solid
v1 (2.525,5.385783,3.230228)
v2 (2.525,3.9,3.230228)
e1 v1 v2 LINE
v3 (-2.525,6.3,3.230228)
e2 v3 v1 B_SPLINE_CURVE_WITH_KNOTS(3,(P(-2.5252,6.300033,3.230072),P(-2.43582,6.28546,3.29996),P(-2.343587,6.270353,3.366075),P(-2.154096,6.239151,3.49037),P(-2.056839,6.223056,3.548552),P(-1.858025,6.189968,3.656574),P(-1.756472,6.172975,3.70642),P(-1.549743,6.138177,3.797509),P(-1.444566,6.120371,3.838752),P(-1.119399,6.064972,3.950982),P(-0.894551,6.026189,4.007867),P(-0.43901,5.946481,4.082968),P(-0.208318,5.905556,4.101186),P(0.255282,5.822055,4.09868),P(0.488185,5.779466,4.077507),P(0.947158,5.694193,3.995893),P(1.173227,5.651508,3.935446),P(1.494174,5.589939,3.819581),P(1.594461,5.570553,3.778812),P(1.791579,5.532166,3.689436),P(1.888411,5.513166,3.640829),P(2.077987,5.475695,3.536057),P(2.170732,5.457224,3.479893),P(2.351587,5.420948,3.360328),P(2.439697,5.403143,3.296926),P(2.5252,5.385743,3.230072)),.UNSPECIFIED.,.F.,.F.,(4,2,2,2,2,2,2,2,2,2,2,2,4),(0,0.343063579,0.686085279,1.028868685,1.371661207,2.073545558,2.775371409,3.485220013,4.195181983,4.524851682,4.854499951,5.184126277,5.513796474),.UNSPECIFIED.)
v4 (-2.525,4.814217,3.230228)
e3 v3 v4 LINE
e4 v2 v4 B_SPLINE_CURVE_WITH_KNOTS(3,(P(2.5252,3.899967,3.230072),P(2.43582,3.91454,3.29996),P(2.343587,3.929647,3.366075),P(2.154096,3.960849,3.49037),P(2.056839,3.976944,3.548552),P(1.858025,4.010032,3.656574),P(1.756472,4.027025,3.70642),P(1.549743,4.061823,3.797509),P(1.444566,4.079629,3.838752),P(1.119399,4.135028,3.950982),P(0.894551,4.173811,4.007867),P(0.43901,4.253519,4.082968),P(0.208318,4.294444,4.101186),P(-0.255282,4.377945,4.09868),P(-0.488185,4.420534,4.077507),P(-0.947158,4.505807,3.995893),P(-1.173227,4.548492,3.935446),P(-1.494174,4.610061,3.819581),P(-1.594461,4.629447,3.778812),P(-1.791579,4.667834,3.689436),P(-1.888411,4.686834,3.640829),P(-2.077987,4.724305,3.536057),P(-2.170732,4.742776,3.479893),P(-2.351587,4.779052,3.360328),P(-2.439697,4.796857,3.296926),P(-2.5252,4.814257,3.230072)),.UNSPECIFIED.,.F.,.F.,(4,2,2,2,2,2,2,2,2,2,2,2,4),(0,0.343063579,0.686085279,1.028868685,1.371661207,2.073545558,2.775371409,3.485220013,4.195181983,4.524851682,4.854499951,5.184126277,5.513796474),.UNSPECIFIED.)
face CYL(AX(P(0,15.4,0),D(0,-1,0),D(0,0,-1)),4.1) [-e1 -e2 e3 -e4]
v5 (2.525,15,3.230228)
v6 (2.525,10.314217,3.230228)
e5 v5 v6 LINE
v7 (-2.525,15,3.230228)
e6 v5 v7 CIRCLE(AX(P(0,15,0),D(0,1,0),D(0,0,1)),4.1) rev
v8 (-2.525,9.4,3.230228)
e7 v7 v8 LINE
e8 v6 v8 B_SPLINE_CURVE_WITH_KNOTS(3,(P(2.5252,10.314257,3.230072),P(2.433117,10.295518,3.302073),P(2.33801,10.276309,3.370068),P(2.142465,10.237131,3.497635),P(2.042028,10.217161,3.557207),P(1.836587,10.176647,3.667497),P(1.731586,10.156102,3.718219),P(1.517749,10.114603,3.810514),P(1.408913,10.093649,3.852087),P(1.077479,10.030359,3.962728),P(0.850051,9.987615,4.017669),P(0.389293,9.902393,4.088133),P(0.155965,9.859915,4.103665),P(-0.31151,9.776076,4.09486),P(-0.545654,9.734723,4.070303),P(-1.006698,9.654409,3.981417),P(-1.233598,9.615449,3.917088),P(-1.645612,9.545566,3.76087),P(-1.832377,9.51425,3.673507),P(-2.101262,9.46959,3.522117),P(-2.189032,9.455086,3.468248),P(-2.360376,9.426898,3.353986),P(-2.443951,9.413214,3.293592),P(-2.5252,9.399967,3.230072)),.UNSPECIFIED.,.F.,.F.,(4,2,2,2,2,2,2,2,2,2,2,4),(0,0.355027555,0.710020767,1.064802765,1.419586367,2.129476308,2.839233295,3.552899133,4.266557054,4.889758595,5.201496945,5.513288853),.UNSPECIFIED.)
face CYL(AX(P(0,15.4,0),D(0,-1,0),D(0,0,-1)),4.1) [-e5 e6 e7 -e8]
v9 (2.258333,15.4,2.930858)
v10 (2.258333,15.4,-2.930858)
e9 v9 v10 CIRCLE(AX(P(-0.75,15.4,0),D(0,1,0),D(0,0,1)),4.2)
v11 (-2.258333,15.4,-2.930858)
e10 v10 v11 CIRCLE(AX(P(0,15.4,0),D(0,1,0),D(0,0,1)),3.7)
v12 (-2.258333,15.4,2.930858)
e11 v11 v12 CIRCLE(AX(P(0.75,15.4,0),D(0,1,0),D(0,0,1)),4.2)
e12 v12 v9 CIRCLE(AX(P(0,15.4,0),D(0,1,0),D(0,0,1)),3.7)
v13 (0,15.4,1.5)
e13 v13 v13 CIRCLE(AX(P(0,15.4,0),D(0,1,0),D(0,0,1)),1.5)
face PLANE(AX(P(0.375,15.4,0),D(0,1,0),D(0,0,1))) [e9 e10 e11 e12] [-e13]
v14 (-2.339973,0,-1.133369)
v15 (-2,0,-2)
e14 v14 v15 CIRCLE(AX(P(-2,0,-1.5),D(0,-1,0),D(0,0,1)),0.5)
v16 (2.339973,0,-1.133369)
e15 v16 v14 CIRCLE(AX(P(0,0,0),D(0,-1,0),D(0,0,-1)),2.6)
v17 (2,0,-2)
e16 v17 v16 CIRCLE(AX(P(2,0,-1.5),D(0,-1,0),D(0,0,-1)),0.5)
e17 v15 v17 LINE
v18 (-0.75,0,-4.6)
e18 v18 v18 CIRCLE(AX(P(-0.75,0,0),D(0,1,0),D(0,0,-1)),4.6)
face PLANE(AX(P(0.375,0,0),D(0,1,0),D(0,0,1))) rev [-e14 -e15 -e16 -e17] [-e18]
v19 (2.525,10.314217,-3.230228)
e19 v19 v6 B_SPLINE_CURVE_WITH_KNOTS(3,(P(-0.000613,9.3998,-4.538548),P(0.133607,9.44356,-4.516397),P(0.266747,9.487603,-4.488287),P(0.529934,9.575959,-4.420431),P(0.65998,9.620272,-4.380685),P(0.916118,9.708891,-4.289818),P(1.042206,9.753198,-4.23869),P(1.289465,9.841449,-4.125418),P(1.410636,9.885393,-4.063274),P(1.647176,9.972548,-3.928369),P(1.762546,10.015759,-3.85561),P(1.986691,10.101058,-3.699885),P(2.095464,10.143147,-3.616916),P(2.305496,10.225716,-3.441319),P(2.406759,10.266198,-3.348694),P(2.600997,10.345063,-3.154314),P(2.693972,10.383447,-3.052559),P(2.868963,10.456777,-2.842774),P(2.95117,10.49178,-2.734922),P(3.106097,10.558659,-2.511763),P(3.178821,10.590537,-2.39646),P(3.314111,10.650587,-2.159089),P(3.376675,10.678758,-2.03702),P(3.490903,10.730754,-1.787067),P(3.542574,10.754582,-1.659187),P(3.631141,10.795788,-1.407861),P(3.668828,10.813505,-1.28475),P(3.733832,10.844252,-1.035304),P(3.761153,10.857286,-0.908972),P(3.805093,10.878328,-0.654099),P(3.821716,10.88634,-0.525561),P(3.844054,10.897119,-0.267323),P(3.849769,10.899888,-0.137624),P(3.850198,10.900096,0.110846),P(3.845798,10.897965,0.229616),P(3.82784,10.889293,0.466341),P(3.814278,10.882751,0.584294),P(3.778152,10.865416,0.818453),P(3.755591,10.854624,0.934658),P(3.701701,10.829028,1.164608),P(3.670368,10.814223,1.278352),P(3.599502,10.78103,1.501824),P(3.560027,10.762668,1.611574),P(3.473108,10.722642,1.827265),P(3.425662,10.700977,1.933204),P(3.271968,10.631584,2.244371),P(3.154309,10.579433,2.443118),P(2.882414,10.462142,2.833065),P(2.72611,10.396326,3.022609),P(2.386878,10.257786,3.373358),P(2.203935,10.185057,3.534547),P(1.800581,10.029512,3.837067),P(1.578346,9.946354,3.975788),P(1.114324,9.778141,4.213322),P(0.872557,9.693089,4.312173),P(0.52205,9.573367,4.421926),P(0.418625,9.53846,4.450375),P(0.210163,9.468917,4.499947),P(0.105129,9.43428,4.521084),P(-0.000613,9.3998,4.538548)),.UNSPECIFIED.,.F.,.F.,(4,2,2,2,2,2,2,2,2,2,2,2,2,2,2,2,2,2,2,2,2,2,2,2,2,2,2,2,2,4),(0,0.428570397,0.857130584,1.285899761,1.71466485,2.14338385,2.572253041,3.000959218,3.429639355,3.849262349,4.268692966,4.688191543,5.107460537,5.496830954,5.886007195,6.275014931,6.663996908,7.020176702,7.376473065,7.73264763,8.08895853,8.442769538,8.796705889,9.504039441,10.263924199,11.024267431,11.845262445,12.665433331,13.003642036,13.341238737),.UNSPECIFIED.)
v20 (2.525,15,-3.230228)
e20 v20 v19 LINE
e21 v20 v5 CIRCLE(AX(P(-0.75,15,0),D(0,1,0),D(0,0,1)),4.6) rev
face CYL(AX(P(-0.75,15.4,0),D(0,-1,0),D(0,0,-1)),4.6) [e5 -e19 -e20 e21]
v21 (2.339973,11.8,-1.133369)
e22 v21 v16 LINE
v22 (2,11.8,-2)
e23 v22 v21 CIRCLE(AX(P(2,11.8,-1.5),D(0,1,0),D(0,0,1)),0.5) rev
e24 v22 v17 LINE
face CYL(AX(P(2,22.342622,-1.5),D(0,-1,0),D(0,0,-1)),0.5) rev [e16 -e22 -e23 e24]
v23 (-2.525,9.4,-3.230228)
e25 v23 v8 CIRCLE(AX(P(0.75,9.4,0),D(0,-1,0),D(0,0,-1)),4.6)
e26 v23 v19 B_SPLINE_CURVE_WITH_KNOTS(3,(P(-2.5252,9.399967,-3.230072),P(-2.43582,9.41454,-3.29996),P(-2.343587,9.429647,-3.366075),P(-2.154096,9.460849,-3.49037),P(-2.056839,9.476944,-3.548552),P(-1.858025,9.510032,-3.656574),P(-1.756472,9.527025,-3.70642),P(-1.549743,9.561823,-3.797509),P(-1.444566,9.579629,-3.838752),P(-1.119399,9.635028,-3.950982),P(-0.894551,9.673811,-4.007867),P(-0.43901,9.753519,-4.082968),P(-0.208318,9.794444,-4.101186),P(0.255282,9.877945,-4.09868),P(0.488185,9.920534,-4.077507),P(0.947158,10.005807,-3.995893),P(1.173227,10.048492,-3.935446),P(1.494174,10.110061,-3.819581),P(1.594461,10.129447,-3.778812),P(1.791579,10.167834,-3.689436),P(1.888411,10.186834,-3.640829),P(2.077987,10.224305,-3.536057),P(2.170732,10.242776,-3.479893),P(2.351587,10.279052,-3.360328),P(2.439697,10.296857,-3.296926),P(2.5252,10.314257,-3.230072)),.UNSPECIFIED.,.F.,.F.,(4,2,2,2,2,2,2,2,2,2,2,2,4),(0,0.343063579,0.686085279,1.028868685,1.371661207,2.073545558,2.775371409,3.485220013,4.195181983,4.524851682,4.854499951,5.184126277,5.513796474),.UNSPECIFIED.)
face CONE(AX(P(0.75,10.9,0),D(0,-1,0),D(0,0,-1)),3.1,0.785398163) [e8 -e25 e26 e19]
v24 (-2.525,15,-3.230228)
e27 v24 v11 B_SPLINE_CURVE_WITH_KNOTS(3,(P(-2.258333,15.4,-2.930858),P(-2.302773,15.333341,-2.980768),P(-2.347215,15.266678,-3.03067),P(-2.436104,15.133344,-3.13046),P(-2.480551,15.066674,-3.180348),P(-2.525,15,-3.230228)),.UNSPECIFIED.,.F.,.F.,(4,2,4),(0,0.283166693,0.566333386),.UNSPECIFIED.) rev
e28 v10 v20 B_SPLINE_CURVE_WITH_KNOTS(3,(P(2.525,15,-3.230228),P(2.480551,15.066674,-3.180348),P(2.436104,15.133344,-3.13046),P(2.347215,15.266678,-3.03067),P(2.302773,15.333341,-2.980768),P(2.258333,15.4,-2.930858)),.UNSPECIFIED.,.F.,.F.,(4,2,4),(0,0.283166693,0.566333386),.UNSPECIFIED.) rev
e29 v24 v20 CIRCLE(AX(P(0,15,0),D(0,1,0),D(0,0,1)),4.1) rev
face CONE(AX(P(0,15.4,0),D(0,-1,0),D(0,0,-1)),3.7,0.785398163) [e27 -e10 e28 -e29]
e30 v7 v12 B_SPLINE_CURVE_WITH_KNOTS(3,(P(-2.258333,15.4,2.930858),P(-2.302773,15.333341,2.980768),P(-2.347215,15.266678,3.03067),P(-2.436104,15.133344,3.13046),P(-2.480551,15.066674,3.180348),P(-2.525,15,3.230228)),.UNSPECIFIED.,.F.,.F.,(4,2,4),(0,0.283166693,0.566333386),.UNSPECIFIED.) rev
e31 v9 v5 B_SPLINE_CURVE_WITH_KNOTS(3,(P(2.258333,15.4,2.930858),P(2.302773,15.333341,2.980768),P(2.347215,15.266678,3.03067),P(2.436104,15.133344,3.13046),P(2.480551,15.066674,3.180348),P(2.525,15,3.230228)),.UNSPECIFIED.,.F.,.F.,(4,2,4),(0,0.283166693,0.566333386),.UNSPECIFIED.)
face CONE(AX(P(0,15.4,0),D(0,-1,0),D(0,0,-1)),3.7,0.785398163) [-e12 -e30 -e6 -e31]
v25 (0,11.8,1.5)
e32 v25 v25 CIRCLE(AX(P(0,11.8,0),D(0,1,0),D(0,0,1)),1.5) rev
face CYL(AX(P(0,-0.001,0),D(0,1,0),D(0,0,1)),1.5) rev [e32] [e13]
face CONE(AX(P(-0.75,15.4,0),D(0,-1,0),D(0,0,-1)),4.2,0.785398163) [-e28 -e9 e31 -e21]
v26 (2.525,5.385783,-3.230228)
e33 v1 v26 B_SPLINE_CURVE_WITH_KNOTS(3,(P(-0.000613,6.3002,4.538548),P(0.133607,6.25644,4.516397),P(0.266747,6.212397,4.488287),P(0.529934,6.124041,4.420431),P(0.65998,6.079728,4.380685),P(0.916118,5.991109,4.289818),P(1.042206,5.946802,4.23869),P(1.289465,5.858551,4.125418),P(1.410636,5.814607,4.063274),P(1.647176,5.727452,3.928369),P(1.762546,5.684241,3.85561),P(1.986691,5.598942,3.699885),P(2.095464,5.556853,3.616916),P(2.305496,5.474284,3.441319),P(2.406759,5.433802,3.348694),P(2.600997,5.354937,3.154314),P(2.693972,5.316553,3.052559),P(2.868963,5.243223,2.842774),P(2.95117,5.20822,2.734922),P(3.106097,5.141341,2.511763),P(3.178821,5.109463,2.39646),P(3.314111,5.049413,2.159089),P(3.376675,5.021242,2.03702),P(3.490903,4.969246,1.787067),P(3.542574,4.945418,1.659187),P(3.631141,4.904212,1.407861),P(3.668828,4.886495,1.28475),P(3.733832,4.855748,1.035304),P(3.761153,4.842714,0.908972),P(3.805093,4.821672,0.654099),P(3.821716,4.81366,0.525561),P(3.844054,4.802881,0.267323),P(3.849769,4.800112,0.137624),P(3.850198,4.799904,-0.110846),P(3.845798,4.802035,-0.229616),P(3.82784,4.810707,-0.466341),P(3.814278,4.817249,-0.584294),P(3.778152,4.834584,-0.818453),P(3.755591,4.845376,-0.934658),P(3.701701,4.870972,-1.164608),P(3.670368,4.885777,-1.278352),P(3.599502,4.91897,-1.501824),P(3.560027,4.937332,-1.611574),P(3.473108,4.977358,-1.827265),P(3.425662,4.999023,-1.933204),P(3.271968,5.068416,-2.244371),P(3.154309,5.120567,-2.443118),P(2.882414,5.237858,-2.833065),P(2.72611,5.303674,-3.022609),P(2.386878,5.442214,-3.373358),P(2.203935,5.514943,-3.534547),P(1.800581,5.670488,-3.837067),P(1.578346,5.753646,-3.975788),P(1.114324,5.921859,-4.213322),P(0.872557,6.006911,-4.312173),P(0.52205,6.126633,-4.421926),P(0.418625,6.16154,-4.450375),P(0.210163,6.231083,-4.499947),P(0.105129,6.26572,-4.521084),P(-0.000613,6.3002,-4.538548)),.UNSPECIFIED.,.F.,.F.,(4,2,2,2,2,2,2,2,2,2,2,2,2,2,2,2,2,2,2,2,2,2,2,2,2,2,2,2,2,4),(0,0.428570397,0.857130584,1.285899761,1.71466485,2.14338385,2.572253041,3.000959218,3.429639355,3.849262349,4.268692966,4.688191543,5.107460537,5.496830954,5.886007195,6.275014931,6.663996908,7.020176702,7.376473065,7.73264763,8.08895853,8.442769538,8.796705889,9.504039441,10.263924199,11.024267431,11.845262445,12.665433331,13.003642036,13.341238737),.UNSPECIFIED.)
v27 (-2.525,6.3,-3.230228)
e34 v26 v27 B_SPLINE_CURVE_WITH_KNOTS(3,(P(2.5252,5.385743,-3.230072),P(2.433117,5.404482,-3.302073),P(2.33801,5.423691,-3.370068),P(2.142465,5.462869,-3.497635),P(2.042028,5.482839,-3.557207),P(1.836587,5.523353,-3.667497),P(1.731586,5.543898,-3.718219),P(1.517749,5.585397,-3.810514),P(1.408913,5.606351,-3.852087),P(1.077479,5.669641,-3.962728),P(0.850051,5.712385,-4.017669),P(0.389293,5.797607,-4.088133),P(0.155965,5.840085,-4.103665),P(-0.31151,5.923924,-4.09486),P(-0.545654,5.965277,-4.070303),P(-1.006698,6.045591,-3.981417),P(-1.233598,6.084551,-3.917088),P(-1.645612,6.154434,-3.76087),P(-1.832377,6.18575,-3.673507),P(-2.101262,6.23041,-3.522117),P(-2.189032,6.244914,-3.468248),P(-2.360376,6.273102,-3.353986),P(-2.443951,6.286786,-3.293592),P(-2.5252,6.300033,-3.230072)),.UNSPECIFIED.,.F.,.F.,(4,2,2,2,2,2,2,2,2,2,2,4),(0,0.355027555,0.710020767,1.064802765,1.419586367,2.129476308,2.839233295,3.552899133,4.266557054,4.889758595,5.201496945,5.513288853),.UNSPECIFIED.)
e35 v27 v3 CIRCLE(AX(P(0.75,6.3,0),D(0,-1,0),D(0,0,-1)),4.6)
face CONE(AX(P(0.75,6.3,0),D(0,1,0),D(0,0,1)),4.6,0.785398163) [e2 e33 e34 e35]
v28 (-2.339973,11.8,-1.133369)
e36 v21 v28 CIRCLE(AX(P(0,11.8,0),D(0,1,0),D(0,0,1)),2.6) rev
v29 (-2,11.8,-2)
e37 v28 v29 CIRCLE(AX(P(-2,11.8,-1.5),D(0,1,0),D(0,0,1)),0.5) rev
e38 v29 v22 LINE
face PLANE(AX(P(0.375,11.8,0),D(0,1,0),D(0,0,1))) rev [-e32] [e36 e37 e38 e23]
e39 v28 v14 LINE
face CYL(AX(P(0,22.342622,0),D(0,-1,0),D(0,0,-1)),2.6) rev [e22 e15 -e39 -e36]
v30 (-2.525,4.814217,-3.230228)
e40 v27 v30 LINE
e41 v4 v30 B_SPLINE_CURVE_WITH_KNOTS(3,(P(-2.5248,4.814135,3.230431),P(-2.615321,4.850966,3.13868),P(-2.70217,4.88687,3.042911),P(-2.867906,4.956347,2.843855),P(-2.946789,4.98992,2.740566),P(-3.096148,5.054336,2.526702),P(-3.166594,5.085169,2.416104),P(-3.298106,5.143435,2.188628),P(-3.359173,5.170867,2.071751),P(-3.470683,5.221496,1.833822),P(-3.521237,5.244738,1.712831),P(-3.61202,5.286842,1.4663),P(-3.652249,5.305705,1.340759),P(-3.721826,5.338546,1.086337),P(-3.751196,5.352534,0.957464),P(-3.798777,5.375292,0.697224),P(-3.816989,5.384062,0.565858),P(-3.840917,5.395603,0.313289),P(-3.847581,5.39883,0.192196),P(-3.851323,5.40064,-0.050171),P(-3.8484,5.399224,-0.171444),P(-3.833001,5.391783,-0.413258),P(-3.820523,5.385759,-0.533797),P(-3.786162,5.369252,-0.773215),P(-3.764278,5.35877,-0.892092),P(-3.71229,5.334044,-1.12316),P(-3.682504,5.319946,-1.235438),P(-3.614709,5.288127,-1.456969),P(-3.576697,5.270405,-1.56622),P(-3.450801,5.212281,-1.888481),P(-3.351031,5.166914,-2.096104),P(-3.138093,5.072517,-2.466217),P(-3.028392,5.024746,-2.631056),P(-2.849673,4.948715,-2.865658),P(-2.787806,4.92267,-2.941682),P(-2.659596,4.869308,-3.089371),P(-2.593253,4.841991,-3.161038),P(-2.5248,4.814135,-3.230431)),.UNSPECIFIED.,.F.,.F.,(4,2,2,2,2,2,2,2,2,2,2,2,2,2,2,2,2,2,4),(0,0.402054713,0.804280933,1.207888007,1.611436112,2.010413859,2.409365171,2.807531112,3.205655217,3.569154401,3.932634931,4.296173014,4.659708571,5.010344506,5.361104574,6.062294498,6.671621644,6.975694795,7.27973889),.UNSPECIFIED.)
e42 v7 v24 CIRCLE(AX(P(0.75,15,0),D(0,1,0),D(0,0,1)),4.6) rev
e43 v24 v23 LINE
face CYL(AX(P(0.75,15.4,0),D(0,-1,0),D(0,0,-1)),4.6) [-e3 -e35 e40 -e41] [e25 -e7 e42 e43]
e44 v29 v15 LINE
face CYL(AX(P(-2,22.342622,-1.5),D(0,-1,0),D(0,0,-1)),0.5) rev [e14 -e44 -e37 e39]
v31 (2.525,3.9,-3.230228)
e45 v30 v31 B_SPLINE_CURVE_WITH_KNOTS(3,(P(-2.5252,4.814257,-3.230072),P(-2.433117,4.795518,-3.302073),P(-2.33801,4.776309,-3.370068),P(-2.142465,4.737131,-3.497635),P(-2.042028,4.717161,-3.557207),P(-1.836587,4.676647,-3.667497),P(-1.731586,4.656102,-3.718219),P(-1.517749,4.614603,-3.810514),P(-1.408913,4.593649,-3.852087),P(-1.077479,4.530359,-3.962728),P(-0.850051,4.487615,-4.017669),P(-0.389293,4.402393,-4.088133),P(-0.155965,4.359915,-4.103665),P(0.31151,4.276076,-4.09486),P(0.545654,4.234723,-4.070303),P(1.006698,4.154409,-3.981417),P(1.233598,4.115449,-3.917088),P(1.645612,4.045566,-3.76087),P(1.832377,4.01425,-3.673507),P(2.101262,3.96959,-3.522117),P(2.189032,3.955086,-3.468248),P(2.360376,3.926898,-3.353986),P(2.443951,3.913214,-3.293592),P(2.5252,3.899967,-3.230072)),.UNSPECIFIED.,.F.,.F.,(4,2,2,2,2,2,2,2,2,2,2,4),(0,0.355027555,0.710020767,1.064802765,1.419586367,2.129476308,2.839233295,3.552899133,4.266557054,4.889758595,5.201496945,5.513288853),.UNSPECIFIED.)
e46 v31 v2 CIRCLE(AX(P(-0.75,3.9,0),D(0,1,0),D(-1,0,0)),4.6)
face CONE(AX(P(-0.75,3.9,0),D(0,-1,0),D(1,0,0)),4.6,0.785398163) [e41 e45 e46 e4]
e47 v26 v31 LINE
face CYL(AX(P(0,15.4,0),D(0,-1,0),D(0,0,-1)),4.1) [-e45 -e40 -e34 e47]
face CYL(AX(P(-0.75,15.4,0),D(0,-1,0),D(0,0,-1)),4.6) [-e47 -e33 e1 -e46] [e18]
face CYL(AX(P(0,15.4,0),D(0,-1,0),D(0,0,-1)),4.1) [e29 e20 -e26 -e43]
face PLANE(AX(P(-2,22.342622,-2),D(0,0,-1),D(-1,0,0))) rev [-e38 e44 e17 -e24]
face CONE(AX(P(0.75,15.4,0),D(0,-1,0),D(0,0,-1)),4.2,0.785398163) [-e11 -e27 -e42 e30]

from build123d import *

# Parameters (mm, degrees)
BOSS_EXTRUDE1_DEPTH = 15.4
CUT_EXTRUDE1_DEPTH  = 11.8
CUT_EXTRUDE2_REACH  = 18.939
SKETCH5_R           = 1.5
CHAMFER1_SIZE       = 0.4


with BuildPart() as part:
    # Sketch1 → Boss-Extrude1 (new body)
    with BuildSketch(Plane(origin=(0, 0, 0), x_dir=(1, 0, 0), z_dir=(0, 1, 0))):
        with BuildLine():
            ThreePointArc((-2.525, -3.23022832), (0, -4.1), (2.525, -3.23022832))
            ThreePointArc((2.525, -3.23022832), (3.85, 0), (2.525, 3.23022832))
            ThreePointArc((2.525, 3.23022832), (0, 4.1), (-2.525, 3.23022832))
            ThreePointArc((-2.525, 3.23022832), (-3.85, 0), (-2.525, -3.23022832))
        make_face()
    extrude(amount=BOSS_EXTRUDE1_DEPTH)

    # Sketch2 → Revolve1 (revolve)
    with BuildSketch(Plane.XY, mode=Mode.PRIVATE) as revolve1_sk:
        Polygon((3.85, 0), (3.85, 3.9), (2.35, 5.4), (-0.75, 5.4), (-0.75, 0), align=None)
    revolve(revolve1_sk.sketch.rotate(Axis((-0.75, 5.4, 0), (0, -1, 0)), 270), axis=Axis((-0.75, 5.4, 0), (0, -1, 0)))

    # Sketch3 → Revolve2 (revolve)
    with BuildSketch(Plane.XY, mode=Mode.PRIVATE) as revolve2_sk:
        Polygon((0.75, 4.8), (-2.35, 4.8), (-3.85, 6.3), (-3.85, 9.4), (-2.35, 10.9), (0.75, 10.9), align=None)
    revolve(revolve2_sk.sketch.rotate(Axis((0.75, 4.8, 0), (0, 1, 0)), 315.394327097), axis=Axis((0.75, 4.8, 0), (0, 1, 0)))

    # Sketch4 → Cut-Extrude1 (cut)
    with BuildSketch(Plane.XZ):
        with BuildLine():
            Line((-2, -2), (2, -2))
            ThreePointArc((2, -2), (2.465465068, -1.682598659), (2.339973189, -1.133369081))
            ThreePointArc((2.339973189, -1.133369081), (0, 2.6), (-2.339973189, -1.133369081))
            ThreePointArc((-2.339973189, -1.133369081), (-2.465465068, -1.682598659), (-2, -2))
        make_face()
    extrude(amount=-CUT_EXTRUDE1_DEPTH, mode=Mode.SUBTRACT)

    # Sketch5 → Cut-Extrude2 (cut, up to next)
    with BuildSketch(Plane(origin=(0, 15.4, 0), x_dir=(1, 0, 0), z_dir=(0, 1, 0)), mode=Mode.PRIVATE) as cut_extrude2_sk1:
        with Locations(Location((0, 0, 0), (0, 0, 270))):
            Circle(SKETCH5_R)
    cut_extrude2_tool1 = extrude(cut_extrude2_sk1.sketch, amount=-CUT_EXTRUDE2_REACH, mode=Mode.PRIVATE) & part.part
    add(cut_extrude2_tool1.solids().sort_by_distance((0, 15.4, 0))[0], mode=Mode.SUBTRACT)

    # Chamfer1
    # the kernel refuses this chamfer: 0.4 mm, written as the material it takes off along each edge
    with BuildSketch(Plane(origin=(0, 15.4, 0), x_dir=(-0.7922190522423981, 0, 0.6102368173620439), z_dir=(-0.6102368173620439, 0, -0.7922190522423981))) as chamfer1_piece_1:
        Polygon((4.1 - CHAMFER1_SIZE, 0), (4.1, -CHAMFER1_SIZE), (4.1, 0), align=None)
    revolve(axis=Axis((0, 15.4, 0), (0, 1, 0)), revolution_arc=104.786743256, mode=Mode.SUBTRACT)
    with BuildSketch(Plane(origin=(-0.75, 15.4, 0), x_dir=(0.5384255548923128, 0, 0.8426730812354843), z_dir=(-0.8426730812354843, 0, 0.5384255548923128))) as chamfer1_piece_2:
        Polygon((4.6 - CHAMFER1_SIZE, 0), (4.6, -CHAMFER1_SIZE), (4.6, 0), align=None)
    revolve(axis=Axis((-0.75, 15.4, 0), (0, 1, 0)), revolution_arc=114.846952535, mode=Mode.SUBTRACT)
    with BuildSketch(Plane(origin=(0, 15.4, 0), x_dir=(0.7922190522423987, 0, -0.610236817362043), z_dir=(0.610236817362043, 0, 0.7922190522423987))) as chamfer1_piece_3:
        Polygon((4.1 - CHAMFER1_SIZE, 0), (4.1, -CHAMFER1_SIZE), (4.1, 0), align=None)
    revolve(axis=Axis((0, 15.4, 0), (0, 1, 0)), revolution_arc=104.786743256, mode=Mode.SUBTRACT)
    with BuildSketch(Plane(origin=(0.75, 15.4, 0), x_dir=(-0.5384255548923127, 0, -0.8426730812354845), z_dir=(0.8426730812354845, 0, -0.5384255548923127))) as chamfer1_piece_4:
        Polygon((4.6 - CHAMFER1_SIZE, 0), (4.6, -CHAMFER1_SIZE), (4.6, 0), align=None)
    revolve(axis=Axis((0.75, 15.4, 0), (0, 1, 0)), revolution_arc=114.846952535, mode=Mode.SUBTRACT)


solid = part.part
